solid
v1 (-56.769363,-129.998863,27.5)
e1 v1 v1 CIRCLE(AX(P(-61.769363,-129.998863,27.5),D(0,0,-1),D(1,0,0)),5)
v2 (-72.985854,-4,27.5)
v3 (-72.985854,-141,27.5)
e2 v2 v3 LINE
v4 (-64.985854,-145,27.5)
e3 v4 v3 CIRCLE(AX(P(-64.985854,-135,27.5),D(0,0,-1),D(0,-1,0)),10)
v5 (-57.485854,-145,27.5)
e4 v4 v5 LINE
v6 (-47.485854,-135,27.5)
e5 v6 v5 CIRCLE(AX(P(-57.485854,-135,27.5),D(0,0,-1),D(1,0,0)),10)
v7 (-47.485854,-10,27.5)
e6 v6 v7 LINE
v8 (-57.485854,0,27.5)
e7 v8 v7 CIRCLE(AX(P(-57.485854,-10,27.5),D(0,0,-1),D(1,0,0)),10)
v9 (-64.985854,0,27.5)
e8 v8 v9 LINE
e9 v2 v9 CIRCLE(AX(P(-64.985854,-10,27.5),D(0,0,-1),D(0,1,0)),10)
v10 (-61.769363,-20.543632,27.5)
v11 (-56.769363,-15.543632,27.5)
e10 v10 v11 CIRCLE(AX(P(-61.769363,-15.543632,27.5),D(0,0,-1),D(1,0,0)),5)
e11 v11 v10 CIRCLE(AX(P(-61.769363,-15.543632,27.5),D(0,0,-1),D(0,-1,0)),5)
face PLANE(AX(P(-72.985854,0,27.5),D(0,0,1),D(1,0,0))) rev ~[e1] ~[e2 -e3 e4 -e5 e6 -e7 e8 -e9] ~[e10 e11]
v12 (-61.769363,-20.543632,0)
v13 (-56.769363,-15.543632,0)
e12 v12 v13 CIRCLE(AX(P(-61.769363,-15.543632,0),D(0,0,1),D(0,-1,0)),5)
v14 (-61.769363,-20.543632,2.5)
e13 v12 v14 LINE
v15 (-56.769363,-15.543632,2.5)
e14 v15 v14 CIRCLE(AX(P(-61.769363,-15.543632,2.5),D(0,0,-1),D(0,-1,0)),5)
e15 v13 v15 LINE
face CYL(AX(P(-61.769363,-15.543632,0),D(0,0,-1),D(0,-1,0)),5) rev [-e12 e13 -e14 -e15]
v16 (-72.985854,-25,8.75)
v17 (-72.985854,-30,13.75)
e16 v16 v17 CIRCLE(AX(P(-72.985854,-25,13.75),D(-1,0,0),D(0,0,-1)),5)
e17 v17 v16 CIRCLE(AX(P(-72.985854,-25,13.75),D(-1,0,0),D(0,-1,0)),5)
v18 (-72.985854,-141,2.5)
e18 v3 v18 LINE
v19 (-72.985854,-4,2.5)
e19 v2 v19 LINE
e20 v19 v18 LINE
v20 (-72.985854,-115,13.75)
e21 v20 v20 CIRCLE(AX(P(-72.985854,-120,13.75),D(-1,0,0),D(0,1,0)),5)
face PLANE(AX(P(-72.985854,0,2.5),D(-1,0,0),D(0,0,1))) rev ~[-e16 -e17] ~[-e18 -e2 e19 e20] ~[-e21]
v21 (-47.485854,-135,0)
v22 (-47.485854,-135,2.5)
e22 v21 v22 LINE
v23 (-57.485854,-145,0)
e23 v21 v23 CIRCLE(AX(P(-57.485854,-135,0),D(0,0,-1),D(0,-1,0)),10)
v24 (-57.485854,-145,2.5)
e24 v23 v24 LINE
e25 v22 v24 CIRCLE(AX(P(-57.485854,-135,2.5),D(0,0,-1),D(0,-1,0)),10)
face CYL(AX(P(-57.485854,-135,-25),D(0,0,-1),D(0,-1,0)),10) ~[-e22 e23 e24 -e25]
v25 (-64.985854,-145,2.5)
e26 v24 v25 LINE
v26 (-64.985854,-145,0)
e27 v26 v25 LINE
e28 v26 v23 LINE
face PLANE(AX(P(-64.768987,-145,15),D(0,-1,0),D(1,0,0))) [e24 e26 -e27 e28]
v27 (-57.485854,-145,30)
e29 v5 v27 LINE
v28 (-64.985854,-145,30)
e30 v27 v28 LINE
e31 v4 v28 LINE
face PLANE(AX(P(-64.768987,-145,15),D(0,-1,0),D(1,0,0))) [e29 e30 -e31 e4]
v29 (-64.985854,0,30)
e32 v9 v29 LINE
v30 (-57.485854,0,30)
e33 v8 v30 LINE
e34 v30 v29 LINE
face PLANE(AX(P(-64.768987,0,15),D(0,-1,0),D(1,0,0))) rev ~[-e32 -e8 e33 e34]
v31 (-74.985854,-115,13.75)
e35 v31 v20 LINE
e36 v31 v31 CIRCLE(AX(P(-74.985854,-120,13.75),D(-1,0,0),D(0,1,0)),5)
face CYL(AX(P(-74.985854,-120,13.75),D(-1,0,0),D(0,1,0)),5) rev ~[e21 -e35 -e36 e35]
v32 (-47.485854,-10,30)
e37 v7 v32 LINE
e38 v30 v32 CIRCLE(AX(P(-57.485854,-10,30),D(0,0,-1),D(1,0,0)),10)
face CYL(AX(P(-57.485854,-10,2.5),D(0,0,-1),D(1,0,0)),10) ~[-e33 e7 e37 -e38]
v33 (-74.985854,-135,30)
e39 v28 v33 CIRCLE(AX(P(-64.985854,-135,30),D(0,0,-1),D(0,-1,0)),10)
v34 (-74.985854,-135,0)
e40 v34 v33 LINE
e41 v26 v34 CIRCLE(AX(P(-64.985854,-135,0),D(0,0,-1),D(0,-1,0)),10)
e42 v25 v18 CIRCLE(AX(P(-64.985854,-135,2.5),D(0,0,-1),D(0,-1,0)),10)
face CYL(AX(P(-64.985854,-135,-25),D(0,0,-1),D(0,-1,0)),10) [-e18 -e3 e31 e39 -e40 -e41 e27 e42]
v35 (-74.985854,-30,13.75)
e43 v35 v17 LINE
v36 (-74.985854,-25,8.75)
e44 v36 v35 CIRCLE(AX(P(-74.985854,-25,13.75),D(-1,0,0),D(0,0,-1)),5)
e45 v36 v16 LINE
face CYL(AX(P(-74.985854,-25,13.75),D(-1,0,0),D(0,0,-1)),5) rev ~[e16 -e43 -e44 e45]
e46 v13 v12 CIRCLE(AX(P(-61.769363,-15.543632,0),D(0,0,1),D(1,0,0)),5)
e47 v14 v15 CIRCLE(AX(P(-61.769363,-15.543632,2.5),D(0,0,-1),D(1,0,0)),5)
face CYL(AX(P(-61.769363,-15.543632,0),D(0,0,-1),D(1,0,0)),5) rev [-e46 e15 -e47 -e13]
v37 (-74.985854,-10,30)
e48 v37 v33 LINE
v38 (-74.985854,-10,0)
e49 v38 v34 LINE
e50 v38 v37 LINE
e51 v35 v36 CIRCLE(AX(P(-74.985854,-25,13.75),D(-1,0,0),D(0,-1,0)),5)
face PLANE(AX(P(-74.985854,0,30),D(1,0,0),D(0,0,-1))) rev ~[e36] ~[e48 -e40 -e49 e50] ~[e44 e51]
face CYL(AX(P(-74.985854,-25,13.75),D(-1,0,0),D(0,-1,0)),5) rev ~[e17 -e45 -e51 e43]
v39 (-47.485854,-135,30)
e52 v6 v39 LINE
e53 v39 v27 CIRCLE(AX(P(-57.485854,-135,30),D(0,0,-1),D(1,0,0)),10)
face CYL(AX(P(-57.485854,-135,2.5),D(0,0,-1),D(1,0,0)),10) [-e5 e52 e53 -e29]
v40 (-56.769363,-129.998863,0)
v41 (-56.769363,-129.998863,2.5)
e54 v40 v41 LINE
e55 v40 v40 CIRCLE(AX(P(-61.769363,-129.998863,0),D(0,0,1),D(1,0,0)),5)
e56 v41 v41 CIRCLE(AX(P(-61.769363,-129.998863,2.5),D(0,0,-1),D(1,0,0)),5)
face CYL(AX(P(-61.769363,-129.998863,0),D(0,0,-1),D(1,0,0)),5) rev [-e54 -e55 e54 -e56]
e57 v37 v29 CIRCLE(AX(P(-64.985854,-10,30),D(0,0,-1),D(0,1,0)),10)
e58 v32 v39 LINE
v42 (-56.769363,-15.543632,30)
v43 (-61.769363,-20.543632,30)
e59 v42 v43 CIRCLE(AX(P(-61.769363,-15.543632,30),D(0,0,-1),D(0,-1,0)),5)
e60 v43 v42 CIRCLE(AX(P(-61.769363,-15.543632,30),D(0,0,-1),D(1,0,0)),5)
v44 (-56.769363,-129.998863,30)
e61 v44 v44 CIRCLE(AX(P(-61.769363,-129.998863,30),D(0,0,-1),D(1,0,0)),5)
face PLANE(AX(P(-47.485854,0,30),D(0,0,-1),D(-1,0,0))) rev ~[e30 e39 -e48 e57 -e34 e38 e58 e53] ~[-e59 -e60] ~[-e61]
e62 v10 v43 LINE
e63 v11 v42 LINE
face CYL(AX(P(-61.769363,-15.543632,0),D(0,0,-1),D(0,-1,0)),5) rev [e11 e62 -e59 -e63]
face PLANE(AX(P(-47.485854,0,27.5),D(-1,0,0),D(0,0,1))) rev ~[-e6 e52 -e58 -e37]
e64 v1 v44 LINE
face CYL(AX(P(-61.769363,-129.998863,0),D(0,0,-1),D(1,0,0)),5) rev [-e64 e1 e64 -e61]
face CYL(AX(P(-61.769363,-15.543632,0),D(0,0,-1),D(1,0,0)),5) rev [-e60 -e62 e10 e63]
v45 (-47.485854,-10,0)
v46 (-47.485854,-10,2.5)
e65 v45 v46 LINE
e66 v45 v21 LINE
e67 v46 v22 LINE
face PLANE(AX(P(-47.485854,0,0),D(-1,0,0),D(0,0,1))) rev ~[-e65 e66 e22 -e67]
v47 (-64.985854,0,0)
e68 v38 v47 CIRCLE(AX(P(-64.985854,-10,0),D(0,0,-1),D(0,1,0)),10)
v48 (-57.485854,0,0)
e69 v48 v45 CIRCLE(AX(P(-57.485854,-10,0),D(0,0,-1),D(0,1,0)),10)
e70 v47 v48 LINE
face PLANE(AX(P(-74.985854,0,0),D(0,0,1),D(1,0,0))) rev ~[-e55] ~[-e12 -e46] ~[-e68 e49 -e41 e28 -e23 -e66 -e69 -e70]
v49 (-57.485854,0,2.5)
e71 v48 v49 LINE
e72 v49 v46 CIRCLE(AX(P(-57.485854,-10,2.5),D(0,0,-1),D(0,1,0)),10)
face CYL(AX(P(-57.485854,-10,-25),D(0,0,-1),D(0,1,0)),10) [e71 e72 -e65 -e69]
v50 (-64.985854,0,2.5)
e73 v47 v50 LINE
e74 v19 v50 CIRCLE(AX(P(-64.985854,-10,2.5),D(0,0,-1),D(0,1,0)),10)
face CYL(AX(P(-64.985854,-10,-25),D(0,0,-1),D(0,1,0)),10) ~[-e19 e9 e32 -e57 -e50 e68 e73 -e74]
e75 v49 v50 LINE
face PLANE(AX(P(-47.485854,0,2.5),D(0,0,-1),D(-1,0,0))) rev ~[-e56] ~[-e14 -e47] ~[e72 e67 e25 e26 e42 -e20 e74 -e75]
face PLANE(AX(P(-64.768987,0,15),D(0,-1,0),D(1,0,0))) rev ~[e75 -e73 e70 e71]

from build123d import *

# Parameters (mm, degrees)
F2_DEPTH    = 145
F1_R        = 5
F3_DEPTH    = 46
F4_T1_DEPTH = 52.5
F4_T3_DEPTH = 52.5
F4_T5_DEPTH = 80
F7_DEPTH    = 25


# Not quite as in the source:
# - a fillet or chamfer that OpenCascade refuses, or shapes differently, is made with other operations: its cross-section is extruded or revolved along the edge and cut away or added


with BuildPart() as f2:
    # F0 (on Front) → F2 (new body)
    with BuildSketch(Plane.XZ):
        Polygon((-74.9858543277, 30), (-74.9858543277, 0), (-47.4858543277, 0), (-47.4858543277, 2.5), (-72.9858543277, 2.5), (-72.9858543277, 27.5), (-47.4858543277, 27.5), (-47.4858543277, 30), align=None)
    extrude(amount=F2_DEPTH)

    # F1 (on Top) → F3 (cut)
    with BuildSketch(Plane.XY):
        with BuildLine():
            ThreePointArc((-59.9858543277, -290), (-54.9858543277, -295), (-49.9858543277, -290))
            ThreePointArc((-49.9858543277, -290), (-54.9858543277, -285), (-59.9858543277, -290))
        make_face()
        with Locations((-54.9858543277, -260)):
            Circle(F1_R)
        with Locations((-61.7693625391, -129.9988627434)):
            Circle(F1_R)
        with BuildLine():
            ThreePointArc((-61.7693625391, -20.5436318724), (-58.2338286331, -19.0791657783), (-56.7693625391, -15.5436318724))
            ThreePointArc((-56.7693625391, -15.5436318724), (-65.304896445, -12.0080979665), (-61.7693625391, -20.5436318724))
        make_face()
    extrude(amount=F3_DEPTH, mode=Mode.SUBTRACT)

    # F4: fillet of radius 10 on 6 edges, made by hand

    # F4_s2 → F4_t1 (cut)
    with BuildSketch(Plane.XY.offset(-25)):
        with BuildLine():
            ThreePointArc((-57.4858543277, 0), (-50.4147865158, -2.9289321881), (-47.4858543277, -10))
            Line((-47.4858543277, -10), (-47.4858543277, 0))
            Line((-47.4858543277, 0), (-57.4858543277, 0))
        make_face()
        with BuildLine():
            ThreePointArc((-57.4858543277, -145), (-50.4147865158, -142.0710678119), (-47.4858543277, -135))
            Line((-47.4858543277, -135), (-47.4858543277, -145))
            Line((-47.4858543277, -145), (-57.4858543277, -145))
        make_face()
    extrude(amount=F4_T1_DEPTH, mode=Mode.SUBTRACT)

    # F4_s4 → F4_t3 (cut)
    with BuildSketch(Plane.XY.offset(2.5)):
        with BuildLine():
            ThreePointArc((-47.4858543277, -10), (-50.4147865158, -2.9289321881), (-57.4858543277, 0))
            Line((-57.4858543277, 0), (-47.4858543277, 0))
            Line((-47.4858543277, 0), (-47.4858543277, -10))
        make_face()
        with BuildLine():
            ThreePointArc((-47.4858543277, -135), (-50.4147865158, -142.0710678119), (-57.4858543277, -145))
            Line((-57.4858543277, -145), (-47.4858543277, -145))
            Line((-47.4858543277, -145), (-47.4858543277, -135))
        make_face()
    extrude(amount=F4_T3_DEPTH, mode=Mode.SUBTRACT)

    # F4_s6 → F4_t5 (cut)
    with BuildSketch(Plane.XY.offset(-25)):
        with BuildLine():
            ThreePointArc((-64.9858543277, 0), (-72.0569221395, -2.9289321881), (-74.9858543277, -10))
            Line((-74.9858543277, -10), (-74.9858543277, 0))
            Line((-74.9858543277, 0), (-64.9858543277, 0))
        make_face()
        with BuildLine():
            ThreePointArc((-64.9858543277, -145), (-72.0569221395, -142.0710678119), (-74.9858543277, -135))
            Line((-74.9858543277, -135), (-74.9858543277, -145))
            Line((-74.9858543277, -145), (-64.9858543277, -145))
        make_face()
    extrude(amount=F4_T5_DEPTH, mode=Mode.SUBTRACT)

    # F6 (on offset) → F7 (cut)
    with BuildSketch(Plane(origin=(-74.9858543277, 0, 0), x_dir=(0, -1, 0), z_dir=(-1, 0, 0))):
        with BuildLine():
            ThreePointArc((30, 13.75), (21.4644660941, 17.2855339059), (25, 8.75))
            Line((25, 8.75), (25, 13.75))
            Line((25, 13.75), (30, 13.75))
        make_face()
        with BuildLine():
            Line((25, 13.75), (25, 8.75))
            ThreePointArc((25, 8.75), (28.5355339059, 10.2144660941), (30, 13.75))
            Line((30, 13.75), (25, 13.75))
        make_face()
        with BuildLine():
            Line((120, 13.75), (125, 13.75))
            ThreePointArc((125, 13.75), (120, 18.75), (115, 13.75))
            Line((115, 13.75), (120, 13.75))
        make_face()
        with BuildLine():
            ThreePointArc((115, 13.75), (120, 8.75), (125, 13.75))
            Line((125, 13.75), (120, 13.75))
            Line((120, 13.75), (115, 13.75))
        make_face()
    extrude(amount=-F7_DEPTH, mode=Mode.SUBTRACT)


solid = f2.part
